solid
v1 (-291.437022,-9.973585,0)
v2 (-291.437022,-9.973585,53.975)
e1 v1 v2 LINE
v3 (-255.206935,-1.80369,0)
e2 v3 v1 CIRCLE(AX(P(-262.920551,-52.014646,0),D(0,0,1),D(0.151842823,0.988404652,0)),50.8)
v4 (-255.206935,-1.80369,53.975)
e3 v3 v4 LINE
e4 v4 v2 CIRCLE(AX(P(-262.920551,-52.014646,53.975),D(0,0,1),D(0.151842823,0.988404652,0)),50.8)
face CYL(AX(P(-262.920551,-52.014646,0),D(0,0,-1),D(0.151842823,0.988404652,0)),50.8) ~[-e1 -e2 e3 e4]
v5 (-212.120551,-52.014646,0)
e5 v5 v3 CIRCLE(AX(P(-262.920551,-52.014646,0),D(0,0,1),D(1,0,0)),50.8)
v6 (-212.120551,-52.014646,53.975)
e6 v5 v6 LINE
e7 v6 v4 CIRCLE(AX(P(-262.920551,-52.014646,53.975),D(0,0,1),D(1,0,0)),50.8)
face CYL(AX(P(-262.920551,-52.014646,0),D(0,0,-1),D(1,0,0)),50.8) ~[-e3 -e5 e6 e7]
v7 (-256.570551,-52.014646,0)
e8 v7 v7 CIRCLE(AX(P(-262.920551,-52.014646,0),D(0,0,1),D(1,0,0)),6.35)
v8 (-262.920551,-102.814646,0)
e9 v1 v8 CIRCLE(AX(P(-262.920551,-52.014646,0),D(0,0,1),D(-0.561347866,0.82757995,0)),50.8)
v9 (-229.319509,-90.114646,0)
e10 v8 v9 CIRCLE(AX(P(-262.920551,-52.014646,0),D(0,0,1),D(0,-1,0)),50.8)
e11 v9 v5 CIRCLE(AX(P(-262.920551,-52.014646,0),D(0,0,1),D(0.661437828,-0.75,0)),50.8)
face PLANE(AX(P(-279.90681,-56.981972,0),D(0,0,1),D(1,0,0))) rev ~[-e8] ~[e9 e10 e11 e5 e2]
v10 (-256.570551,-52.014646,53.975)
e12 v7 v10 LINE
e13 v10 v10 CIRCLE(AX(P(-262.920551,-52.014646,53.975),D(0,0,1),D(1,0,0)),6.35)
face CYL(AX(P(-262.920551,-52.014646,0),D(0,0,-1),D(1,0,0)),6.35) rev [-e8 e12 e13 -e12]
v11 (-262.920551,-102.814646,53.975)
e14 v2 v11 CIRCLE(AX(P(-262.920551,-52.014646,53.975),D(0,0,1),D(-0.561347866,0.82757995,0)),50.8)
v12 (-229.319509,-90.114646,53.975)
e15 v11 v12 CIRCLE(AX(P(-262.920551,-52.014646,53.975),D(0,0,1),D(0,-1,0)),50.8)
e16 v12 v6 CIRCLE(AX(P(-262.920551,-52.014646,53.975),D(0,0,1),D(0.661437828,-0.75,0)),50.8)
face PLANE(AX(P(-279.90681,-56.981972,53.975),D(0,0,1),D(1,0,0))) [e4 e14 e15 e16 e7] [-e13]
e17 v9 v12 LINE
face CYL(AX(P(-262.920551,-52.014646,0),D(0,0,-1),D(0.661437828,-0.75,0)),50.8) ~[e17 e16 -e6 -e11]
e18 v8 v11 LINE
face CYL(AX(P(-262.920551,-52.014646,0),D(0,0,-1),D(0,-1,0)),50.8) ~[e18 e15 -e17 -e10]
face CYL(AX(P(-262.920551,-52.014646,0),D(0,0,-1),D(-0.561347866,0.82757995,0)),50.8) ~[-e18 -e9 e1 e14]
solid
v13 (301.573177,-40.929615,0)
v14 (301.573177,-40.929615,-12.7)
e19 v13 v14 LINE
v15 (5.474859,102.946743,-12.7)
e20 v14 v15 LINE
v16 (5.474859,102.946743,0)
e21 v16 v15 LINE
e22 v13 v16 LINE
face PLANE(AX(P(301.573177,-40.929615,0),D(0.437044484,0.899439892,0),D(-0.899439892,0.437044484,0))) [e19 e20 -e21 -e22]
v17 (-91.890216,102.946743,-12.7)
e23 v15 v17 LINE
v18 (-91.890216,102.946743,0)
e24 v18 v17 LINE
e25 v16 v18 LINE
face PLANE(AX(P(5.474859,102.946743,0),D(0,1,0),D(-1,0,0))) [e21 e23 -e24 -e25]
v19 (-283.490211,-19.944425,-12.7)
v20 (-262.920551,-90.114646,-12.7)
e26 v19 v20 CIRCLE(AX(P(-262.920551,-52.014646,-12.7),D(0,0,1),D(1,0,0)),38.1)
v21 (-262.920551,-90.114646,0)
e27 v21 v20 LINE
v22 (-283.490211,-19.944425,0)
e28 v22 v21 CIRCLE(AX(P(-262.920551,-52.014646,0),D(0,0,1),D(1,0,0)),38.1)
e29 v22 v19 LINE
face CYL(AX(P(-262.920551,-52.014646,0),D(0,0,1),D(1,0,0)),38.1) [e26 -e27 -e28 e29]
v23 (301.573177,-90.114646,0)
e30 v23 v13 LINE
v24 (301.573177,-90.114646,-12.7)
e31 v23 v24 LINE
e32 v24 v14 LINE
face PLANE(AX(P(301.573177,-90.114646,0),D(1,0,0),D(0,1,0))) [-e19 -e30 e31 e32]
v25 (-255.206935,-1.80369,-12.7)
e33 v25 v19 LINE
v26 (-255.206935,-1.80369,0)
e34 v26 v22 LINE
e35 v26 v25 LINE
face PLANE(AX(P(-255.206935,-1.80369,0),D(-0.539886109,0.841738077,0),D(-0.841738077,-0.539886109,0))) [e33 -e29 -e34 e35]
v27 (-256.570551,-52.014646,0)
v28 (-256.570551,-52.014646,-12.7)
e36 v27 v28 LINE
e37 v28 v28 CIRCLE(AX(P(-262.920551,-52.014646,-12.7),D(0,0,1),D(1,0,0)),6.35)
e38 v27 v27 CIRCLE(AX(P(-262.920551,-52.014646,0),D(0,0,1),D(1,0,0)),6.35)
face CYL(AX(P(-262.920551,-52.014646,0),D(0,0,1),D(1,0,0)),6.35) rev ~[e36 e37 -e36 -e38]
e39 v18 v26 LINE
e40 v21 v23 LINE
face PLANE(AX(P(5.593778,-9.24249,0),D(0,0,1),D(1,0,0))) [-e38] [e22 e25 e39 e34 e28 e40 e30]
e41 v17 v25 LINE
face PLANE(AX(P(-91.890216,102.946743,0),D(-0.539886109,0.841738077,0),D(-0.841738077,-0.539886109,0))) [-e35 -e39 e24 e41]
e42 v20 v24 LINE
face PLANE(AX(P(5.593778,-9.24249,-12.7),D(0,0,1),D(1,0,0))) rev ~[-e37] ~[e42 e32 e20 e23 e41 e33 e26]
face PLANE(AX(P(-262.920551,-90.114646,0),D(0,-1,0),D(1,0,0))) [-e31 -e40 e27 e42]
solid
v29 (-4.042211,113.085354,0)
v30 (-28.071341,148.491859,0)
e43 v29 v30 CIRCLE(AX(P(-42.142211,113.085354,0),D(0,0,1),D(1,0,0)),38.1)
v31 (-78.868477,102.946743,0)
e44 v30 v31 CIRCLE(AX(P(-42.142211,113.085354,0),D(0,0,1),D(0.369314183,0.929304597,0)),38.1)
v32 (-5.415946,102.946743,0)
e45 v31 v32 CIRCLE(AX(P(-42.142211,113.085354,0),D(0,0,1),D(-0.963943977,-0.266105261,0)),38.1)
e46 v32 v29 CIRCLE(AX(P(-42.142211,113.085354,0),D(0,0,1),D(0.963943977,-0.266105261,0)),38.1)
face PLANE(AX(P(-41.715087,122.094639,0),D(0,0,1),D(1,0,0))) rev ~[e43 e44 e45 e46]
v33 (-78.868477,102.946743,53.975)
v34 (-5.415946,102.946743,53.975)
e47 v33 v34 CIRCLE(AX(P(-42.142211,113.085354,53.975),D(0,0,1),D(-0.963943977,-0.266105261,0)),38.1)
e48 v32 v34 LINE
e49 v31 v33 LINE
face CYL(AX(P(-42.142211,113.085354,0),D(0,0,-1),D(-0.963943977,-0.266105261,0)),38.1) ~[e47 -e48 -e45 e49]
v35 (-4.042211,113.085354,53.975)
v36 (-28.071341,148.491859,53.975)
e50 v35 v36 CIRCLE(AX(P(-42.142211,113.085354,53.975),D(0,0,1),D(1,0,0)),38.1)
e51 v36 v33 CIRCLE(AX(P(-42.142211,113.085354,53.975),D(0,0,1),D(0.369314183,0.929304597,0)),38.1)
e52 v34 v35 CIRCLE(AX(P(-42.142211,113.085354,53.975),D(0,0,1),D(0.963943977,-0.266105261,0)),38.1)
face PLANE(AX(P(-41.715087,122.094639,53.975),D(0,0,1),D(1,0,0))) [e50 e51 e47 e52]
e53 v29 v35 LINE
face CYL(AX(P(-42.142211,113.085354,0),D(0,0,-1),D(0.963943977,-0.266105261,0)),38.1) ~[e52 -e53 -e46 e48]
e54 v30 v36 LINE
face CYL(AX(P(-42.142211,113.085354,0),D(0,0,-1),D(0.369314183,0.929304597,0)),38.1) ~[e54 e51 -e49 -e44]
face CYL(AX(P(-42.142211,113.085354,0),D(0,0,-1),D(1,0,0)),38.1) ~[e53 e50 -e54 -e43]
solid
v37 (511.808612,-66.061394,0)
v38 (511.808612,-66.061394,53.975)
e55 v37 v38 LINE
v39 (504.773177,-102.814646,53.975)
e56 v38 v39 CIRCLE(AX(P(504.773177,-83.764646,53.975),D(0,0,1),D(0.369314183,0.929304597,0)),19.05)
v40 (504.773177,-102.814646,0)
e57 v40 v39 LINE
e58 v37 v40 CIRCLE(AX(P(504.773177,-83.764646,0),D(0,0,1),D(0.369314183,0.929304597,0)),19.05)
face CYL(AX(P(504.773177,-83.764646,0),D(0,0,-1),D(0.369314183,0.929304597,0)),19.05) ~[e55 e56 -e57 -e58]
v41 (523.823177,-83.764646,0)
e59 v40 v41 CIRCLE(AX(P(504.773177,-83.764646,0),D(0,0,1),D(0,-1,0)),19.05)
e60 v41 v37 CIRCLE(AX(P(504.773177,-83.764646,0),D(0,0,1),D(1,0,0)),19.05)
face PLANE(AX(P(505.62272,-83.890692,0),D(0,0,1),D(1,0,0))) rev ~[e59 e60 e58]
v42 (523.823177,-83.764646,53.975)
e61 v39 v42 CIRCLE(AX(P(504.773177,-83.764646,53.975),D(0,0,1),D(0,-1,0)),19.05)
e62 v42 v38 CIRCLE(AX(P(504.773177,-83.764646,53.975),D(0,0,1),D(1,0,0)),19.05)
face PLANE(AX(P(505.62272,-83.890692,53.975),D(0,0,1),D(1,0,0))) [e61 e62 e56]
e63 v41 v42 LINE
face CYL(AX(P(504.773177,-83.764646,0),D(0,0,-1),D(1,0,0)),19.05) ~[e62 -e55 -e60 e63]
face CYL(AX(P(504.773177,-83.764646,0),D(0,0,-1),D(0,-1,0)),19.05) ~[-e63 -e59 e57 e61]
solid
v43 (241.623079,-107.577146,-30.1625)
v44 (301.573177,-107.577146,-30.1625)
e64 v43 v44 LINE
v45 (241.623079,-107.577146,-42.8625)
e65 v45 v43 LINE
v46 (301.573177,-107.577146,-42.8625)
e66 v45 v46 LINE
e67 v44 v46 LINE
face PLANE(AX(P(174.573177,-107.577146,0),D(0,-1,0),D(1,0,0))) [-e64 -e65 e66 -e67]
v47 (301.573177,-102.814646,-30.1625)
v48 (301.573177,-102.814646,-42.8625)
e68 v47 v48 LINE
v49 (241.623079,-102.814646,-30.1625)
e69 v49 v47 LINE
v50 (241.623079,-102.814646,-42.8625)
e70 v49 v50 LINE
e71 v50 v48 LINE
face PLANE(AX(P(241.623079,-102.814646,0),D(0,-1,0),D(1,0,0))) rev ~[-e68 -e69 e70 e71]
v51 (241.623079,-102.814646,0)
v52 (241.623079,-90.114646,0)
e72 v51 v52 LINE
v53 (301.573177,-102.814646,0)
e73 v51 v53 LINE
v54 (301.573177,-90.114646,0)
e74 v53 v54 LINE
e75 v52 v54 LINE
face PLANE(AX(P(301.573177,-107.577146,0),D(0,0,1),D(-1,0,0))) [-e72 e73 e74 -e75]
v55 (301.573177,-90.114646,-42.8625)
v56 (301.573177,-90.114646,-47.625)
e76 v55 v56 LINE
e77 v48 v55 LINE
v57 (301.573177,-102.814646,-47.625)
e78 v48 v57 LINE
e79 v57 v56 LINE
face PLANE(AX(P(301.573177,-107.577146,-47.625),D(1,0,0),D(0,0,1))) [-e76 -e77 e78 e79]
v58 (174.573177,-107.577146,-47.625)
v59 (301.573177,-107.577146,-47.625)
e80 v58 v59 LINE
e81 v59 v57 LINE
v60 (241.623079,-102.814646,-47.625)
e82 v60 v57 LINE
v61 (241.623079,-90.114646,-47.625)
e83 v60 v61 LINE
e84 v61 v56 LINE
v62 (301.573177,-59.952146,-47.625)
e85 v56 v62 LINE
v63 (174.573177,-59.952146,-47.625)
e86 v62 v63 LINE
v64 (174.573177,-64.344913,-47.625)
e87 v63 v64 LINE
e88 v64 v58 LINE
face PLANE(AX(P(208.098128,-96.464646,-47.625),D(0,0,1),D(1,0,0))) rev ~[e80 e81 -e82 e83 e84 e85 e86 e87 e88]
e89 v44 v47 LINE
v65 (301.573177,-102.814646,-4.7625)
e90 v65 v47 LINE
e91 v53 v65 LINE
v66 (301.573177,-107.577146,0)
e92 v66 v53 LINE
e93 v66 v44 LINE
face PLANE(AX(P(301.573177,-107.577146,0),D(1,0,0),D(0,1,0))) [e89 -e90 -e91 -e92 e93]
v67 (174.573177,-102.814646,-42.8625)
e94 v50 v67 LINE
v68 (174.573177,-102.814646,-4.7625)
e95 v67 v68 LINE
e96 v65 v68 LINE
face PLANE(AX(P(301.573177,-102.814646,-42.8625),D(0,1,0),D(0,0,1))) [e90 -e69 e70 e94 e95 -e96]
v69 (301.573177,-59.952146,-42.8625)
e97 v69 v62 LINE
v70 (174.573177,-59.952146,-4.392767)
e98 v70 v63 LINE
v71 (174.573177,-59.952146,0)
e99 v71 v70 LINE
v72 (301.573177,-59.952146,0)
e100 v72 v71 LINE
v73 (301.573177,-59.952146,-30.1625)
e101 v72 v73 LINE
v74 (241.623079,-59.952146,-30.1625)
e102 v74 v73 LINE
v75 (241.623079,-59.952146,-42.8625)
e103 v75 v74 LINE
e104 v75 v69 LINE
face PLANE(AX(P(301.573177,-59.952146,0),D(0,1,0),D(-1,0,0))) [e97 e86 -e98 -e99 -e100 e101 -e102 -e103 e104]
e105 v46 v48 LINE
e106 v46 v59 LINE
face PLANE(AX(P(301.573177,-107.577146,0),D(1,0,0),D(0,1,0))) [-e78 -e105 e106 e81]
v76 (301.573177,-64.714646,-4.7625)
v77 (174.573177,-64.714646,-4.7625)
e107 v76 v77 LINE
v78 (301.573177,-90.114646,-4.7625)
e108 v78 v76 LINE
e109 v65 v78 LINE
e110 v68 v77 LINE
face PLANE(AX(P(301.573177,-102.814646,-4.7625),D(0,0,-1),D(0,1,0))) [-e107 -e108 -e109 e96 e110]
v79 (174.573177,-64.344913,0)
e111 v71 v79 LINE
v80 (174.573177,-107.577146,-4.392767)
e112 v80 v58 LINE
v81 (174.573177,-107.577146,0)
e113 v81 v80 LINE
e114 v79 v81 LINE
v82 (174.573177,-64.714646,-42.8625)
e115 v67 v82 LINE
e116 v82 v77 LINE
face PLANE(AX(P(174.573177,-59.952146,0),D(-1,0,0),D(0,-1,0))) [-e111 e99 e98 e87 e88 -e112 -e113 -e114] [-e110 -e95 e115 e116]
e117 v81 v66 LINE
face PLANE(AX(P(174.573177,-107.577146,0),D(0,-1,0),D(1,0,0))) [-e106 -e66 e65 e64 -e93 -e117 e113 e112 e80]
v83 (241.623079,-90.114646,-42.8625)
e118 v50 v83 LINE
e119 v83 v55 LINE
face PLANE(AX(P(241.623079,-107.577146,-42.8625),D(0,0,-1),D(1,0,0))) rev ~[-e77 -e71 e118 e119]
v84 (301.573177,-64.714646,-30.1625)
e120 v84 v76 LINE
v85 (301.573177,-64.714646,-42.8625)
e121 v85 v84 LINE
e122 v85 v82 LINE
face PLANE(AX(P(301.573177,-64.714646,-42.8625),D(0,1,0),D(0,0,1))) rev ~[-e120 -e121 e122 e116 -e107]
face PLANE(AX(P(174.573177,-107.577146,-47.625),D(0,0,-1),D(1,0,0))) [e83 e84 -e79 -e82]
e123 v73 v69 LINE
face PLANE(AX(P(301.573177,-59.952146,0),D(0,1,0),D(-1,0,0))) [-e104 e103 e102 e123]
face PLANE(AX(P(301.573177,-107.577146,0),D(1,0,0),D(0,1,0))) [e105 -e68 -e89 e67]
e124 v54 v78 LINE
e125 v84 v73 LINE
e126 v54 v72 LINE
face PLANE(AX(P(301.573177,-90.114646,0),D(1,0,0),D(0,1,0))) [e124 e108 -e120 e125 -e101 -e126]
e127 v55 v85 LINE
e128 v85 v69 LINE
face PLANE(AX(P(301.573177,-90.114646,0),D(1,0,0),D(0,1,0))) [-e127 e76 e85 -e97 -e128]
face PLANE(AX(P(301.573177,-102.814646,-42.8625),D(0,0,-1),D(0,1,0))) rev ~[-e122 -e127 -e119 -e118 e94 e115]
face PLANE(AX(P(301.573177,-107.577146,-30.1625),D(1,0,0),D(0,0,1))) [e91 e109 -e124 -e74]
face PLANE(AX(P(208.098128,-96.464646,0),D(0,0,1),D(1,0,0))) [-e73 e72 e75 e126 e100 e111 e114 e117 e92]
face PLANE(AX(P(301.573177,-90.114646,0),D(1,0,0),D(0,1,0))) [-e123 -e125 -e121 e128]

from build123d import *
from build123d import SkipClean  # not in build123d's __all__

# Parameters (mm, degrees)
F0_W            = 67.0499014769
F0_H            = 12.7
F0_H_2          = 4.7625
F0_W_2          = 59.9500985231
F0_H_3          = 25.7697334349
F1_DEPTH        = 47.625
F1_COPIES_COUNT = 2
F1_COPIES_ANGLE = 90
F2_W            = 38.1
F2_H            = 38.1
F3_DEPTH        = 127
F0_R            = 6.35
F0_W_3          = 339.3500985231
F4_DEPTH        = 12.7
F5_DEPTH        = 53.975


# Not quite as in the source:
# - a pattern or mirror of a feature is missing from the dataset's text; its kind, count and spacing are read off the source's solid
# - a feature names something its author has since deleted; it is built from what else it names


with BuildPart() as f1:
    # F0 (on Top) → F1 (new body)
    with BuildSketch(Plane.XY):
        with Locations((208.0981279893, -96.4646462023)):
            Rectangle(F0_W, F0_H)
        with Locations((208.0981279893, -105.1958962023)):
            Rectangle(F0_W, F0_H_2)
        with Locations((271.5981279893, -105.1958962023)):
            Rectangle(F0_W_2, F0_H_2)
        with Locations((208.0981279893, -77.2297794849)):
            Rectangle(F0_W, F0_H_3)
        Polygon((241.6230787277, -64.3449127674), (241.6230787277, -90.1146462023), (301.5731772508, -90.1146462023), (301.5731772508, -59.9521462023), (174.5731772508, -59.9521462023), (174.5731772508, -64.3449127674), align=None)
    extrude(amount=-F1_DEPTH)

    # F1_copies: F1 ×2 about axis
    f1_copies_axis = Axis((0, -83.764646, -23.8125), (1, 0, 0))


with BuildPart() as f1_1:
    add(f1.part, clean=False)
    with SkipClean():  # cleaning this boolean's faces spoils the solid; the shape is the same uncleaned
        for i in range(1, F1_COPIES_COUNT):
            add(f1.part.rotate(f1_copies_axis, i * F1_COPIES_ANGLE / (F1_COPIES_COUNT - 1)), clean=False)

    # F2 (on face) → F3 (cut, through all)
    with BuildSketch(Plane.YZ.offset(301.5731772508)):
        with Locations((-83.7646462023, -23.8125)):
            Rectangle(F2_W, F2_H)
    with SkipClean():  # cleaning this boolean's faces spoils the solid; the shape is the same uncleaned
        extrude(amount=-F3_DEPTH, mode=Mode.SUBTRACT)


with BuildPart() as f4:
    # F0 (on Top) → F4 (new body)
    with BuildSketch(Plane.XY):
        with BuildLine():
            Line((-91.8902158737, 102.9467433691), (-255.2069353227, -1.8036898565))
            ThreePointArc((-255.2069353227, -1.8036898565), (-224.3686917514, -18.9330173376), (-212.1205507423, -52.0146462023))
            ThreePointArc((-212.1205507423, -52.0146462023), (-216.6195090918, -72.9156878528), (-229.3195090918, -90.1146462023))
            Line((-229.3195090918, -90.1146462023), (-164.7769212723, -90.1146462023))
            Line((-164.7769212723, -90.1146462023), (-164.7769212723, -64.3449127674))
            Line((-164.7769212723, -64.3449127674), (174.5731772508, -64.3449127674))
            Line((174.5731772508, -64.3449127674), (174.5731772508, -59.9521462023))
            Line((174.5731772508, -59.9521462023), (301.5731772508, -59.9521462023))
            Line((301.5731772508, -59.9521462023), (301.5731772508, -40.9296154976))
            Line((301.5731772508, -40.9296154976), (5.4748591793, 102.9467433691))
            Line((5.4748591793, 102.9467433691), (-5.4159459459, 102.9467433691))
            ThreePointArc((-5.4159459459, 102.9467433691), (-42.1422114596, 74.9853537977), (-78.8684769732, 102.9467433691))
            Line((-78.8684769732, 102.9467433691), (-91.8902158737, 102.9467433691))
        make_face()
        with BuildLine():
            ThreePointArc((-212.1205507423, -52.0146462023), (-224.3686917514, -18.9330173376), (-255.2069353227, -1.8036898565))
            Line((-255.2069353227, -1.8036898565), (-283.4902114903, -19.9444254873))
            ThreePointArc((-283.4902114903, -19.9444254873), (-244.646170787, -18.5832681684), (-224.8205507423, -52.0146462023))
            ThreePointArc((-224.8205507423, -52.0146462023), (-235.9797823791, -78.9554145655), (-262.9205507423, -90.1146462023))
            Line((-262.9205507423, -90.1146462023), (-229.3195090918, -90.1146462023))
            ThreePointArc((-229.3195090918, -90.1146462023), (-216.6195090918, -72.9156878528), (-212.1205507423, -52.0146462023))
        make_face()
        with BuildLine():
            ThreePointArc((-224.8205507423, -52.0146462023), (-244.646170787, -18.5832681684), (-283.4902114903, -19.9444254873))
            ThreePointArc((-283.4902114903, -19.9444254873), (-299.4820428429, -62.7322623262), (-262.9205507423, -90.1146462023))
            ThreePointArc((-262.9205507423, -90.1146462023), (-235.9797823791, -78.9554145655), (-224.8205507423, -52.0146462023))
        make_face()
        with Locations((-262.9205507423, -52.0146462023)):
            Circle(F0_R, mode=Mode.SUBTRACT)
        with Locations((4.8981279893, -77.2297794849)):
            Rectangle(F0_W_3, F0_H_3)
        with BuildLine():
            Line((-5.4159459459, 102.9467433691), (-78.8684769732, 102.9467433691))
            ThreePointArc((-78.8684769732, 102.9467433691), (-42.1422114596, 74.9853537977), (-5.4159459459, 102.9467433691))
        make_face()
        with Locations((208.0981279893, -77.2297794849)):
            Rectangle(F0_W, F0_H_3)
        Polygon((241.6230787277, -64.3449127674), (241.6230787277, -90.1146462023), (301.5731772508, -90.1146462023), (301.5731772508, -59.9521462023), (174.5731772508, -59.9521462023), (174.5731772508, -64.3449127674), align=None)
    extrude(amount=-F4_DEPTH)


with BuildPart() as f5:
    # F0 (on Top) → F5 (new body)
    with BuildSketch(Plane.XY):
        with BuildLine():
            ThreePointArc((-28.0713410878, 148.4918589483), (-46.2820197032, 150.9597777234), (-63.5295651655, 144.616149878))
            ThreePointArc((-63.5295651655, 144.616149878), (-77.896694317, 126.2469249653), (-78.8684769732, 102.9467433691))
            Line((-78.8684769732, 102.9467433691), (-5.4159459459, 102.9467433691))
            ThreePointArc((-5.4159459459, 102.9467433691), (-4.3872070491, 107.9697265668), (-4.0422114596, 113.0853537977))
            ThreePointArc((-4.0422114596, 113.0853537977), (-10.6167442849, 134.4805616587), (-28.0713410878, 148.4918589483))
        make_face()
        with BuildLine():
            Line((-5.4159459459, 102.9467433691), (-78.8684769732, 102.9467433691))
            ThreePointArc((-78.8684769732, 102.9467433691), (-42.1422114596, 74.9853537977), (-5.4159459459, 102.9467433691))
        make_face()
    extrude(amount=F5_DEPTH)


with BuildPart() as f5b:
    # F0 (on Top) → F5, piece 2 (new body)
    with BuildSketch(Plane.XY):
        with BuildLine():
            ThreePointArc((-255.2069353227, -1.8036898565), (-274.0953662705, -2.4589855982), (-291.4370223503, -9.973584762))
            ThreePointArc((-291.4370223503, -9.973584762), (-311.4814708385, -66.9303104321), (-262.9205507423, -102.8146462023))
            ThreePointArc((-262.9205507423, -102.8146462023), (-244.9600385002, -99.5336950144), (-229.3195090918, -90.1146462023))
            Line((-229.3195090918, -90.1146462023), (-262.9205507423, -90.1146462023))
            ThreePointArc((-262.9205507423, -90.1146462023), (-299.4820428429, -62.7322623262), (-283.4902114903, -19.9444254873))
            Line((-283.4902114903, -19.9444254873), (-255.2069353227, -1.8036898565))
        make_face()
        with BuildLine():
            ThreePointArc((-224.8205507423, -52.0146462023), (-244.646170787, -18.5832681684), (-283.4902114903, -19.9444254873))
            ThreePointArc((-283.4902114903, -19.9444254873), (-299.4820428429, -62.7322623262), (-262.9205507423, -90.1146462023))
            ThreePointArc((-262.9205507423, -90.1146462023), (-235.9797823791, -78.9554145655), (-224.8205507423, -52.0146462023))
        make_face()
        with Locations((-262.9205507423, -52.0146462023)):
            Circle(F0_R, mode=Mode.SUBTRACT)
        with BuildLine():
            ThreePointArc((-212.1205507423, -52.0146462023), (-224.3686917514, -18.9330173376), (-255.2069353227, -1.8036898565))
            Line((-255.2069353227, -1.8036898565), (-283.4902114903, -19.9444254873))
            ThreePointArc((-283.4902114903, -19.9444254873), (-244.646170787, -18.5832681684), (-224.8205507423, -52.0146462023))
            ThreePointArc((-224.8205507423, -52.0146462023), (-235.9797823791, -78.9554145655), (-262.9205507423, -90.1146462023))
            Line((-262.9205507423, -90.1146462023), (-229.3195090918, -90.1146462023))
            ThreePointArc((-229.3195090918, -90.1146462023), (-216.6195090918, -72.9156878528), (-212.1205507423, -52.0146462023))
        make_face()
    extrude(amount=F5_DEPTH)


with BuildPart() as f5c:
    # F0 (on Top) → F5, piece 3 (new body)
    with BuildSketch(Plane.XY):
        with BuildLine():
            ThreePointArc((523.8231772508, -83.7646462023), (520.5359108382, -73.0670422718), (511.8086124367, -66.061393627))
            ThreePointArc((511.8086124367, -66.061393627), (486.0628931595, -80.1830586744), (504.7731772508, -102.8146462023))
            ThreePointArc((504.7731772508, -102.8146462023), (518.2435614324, -97.2350303839), (523.8231772508, -83.7646462023))
        make_face()
    extrude(amount=F5_DEPTH)


solid = Compound([f1_1.part, f4.part, f5.part, f5b.part, f5c.part])
